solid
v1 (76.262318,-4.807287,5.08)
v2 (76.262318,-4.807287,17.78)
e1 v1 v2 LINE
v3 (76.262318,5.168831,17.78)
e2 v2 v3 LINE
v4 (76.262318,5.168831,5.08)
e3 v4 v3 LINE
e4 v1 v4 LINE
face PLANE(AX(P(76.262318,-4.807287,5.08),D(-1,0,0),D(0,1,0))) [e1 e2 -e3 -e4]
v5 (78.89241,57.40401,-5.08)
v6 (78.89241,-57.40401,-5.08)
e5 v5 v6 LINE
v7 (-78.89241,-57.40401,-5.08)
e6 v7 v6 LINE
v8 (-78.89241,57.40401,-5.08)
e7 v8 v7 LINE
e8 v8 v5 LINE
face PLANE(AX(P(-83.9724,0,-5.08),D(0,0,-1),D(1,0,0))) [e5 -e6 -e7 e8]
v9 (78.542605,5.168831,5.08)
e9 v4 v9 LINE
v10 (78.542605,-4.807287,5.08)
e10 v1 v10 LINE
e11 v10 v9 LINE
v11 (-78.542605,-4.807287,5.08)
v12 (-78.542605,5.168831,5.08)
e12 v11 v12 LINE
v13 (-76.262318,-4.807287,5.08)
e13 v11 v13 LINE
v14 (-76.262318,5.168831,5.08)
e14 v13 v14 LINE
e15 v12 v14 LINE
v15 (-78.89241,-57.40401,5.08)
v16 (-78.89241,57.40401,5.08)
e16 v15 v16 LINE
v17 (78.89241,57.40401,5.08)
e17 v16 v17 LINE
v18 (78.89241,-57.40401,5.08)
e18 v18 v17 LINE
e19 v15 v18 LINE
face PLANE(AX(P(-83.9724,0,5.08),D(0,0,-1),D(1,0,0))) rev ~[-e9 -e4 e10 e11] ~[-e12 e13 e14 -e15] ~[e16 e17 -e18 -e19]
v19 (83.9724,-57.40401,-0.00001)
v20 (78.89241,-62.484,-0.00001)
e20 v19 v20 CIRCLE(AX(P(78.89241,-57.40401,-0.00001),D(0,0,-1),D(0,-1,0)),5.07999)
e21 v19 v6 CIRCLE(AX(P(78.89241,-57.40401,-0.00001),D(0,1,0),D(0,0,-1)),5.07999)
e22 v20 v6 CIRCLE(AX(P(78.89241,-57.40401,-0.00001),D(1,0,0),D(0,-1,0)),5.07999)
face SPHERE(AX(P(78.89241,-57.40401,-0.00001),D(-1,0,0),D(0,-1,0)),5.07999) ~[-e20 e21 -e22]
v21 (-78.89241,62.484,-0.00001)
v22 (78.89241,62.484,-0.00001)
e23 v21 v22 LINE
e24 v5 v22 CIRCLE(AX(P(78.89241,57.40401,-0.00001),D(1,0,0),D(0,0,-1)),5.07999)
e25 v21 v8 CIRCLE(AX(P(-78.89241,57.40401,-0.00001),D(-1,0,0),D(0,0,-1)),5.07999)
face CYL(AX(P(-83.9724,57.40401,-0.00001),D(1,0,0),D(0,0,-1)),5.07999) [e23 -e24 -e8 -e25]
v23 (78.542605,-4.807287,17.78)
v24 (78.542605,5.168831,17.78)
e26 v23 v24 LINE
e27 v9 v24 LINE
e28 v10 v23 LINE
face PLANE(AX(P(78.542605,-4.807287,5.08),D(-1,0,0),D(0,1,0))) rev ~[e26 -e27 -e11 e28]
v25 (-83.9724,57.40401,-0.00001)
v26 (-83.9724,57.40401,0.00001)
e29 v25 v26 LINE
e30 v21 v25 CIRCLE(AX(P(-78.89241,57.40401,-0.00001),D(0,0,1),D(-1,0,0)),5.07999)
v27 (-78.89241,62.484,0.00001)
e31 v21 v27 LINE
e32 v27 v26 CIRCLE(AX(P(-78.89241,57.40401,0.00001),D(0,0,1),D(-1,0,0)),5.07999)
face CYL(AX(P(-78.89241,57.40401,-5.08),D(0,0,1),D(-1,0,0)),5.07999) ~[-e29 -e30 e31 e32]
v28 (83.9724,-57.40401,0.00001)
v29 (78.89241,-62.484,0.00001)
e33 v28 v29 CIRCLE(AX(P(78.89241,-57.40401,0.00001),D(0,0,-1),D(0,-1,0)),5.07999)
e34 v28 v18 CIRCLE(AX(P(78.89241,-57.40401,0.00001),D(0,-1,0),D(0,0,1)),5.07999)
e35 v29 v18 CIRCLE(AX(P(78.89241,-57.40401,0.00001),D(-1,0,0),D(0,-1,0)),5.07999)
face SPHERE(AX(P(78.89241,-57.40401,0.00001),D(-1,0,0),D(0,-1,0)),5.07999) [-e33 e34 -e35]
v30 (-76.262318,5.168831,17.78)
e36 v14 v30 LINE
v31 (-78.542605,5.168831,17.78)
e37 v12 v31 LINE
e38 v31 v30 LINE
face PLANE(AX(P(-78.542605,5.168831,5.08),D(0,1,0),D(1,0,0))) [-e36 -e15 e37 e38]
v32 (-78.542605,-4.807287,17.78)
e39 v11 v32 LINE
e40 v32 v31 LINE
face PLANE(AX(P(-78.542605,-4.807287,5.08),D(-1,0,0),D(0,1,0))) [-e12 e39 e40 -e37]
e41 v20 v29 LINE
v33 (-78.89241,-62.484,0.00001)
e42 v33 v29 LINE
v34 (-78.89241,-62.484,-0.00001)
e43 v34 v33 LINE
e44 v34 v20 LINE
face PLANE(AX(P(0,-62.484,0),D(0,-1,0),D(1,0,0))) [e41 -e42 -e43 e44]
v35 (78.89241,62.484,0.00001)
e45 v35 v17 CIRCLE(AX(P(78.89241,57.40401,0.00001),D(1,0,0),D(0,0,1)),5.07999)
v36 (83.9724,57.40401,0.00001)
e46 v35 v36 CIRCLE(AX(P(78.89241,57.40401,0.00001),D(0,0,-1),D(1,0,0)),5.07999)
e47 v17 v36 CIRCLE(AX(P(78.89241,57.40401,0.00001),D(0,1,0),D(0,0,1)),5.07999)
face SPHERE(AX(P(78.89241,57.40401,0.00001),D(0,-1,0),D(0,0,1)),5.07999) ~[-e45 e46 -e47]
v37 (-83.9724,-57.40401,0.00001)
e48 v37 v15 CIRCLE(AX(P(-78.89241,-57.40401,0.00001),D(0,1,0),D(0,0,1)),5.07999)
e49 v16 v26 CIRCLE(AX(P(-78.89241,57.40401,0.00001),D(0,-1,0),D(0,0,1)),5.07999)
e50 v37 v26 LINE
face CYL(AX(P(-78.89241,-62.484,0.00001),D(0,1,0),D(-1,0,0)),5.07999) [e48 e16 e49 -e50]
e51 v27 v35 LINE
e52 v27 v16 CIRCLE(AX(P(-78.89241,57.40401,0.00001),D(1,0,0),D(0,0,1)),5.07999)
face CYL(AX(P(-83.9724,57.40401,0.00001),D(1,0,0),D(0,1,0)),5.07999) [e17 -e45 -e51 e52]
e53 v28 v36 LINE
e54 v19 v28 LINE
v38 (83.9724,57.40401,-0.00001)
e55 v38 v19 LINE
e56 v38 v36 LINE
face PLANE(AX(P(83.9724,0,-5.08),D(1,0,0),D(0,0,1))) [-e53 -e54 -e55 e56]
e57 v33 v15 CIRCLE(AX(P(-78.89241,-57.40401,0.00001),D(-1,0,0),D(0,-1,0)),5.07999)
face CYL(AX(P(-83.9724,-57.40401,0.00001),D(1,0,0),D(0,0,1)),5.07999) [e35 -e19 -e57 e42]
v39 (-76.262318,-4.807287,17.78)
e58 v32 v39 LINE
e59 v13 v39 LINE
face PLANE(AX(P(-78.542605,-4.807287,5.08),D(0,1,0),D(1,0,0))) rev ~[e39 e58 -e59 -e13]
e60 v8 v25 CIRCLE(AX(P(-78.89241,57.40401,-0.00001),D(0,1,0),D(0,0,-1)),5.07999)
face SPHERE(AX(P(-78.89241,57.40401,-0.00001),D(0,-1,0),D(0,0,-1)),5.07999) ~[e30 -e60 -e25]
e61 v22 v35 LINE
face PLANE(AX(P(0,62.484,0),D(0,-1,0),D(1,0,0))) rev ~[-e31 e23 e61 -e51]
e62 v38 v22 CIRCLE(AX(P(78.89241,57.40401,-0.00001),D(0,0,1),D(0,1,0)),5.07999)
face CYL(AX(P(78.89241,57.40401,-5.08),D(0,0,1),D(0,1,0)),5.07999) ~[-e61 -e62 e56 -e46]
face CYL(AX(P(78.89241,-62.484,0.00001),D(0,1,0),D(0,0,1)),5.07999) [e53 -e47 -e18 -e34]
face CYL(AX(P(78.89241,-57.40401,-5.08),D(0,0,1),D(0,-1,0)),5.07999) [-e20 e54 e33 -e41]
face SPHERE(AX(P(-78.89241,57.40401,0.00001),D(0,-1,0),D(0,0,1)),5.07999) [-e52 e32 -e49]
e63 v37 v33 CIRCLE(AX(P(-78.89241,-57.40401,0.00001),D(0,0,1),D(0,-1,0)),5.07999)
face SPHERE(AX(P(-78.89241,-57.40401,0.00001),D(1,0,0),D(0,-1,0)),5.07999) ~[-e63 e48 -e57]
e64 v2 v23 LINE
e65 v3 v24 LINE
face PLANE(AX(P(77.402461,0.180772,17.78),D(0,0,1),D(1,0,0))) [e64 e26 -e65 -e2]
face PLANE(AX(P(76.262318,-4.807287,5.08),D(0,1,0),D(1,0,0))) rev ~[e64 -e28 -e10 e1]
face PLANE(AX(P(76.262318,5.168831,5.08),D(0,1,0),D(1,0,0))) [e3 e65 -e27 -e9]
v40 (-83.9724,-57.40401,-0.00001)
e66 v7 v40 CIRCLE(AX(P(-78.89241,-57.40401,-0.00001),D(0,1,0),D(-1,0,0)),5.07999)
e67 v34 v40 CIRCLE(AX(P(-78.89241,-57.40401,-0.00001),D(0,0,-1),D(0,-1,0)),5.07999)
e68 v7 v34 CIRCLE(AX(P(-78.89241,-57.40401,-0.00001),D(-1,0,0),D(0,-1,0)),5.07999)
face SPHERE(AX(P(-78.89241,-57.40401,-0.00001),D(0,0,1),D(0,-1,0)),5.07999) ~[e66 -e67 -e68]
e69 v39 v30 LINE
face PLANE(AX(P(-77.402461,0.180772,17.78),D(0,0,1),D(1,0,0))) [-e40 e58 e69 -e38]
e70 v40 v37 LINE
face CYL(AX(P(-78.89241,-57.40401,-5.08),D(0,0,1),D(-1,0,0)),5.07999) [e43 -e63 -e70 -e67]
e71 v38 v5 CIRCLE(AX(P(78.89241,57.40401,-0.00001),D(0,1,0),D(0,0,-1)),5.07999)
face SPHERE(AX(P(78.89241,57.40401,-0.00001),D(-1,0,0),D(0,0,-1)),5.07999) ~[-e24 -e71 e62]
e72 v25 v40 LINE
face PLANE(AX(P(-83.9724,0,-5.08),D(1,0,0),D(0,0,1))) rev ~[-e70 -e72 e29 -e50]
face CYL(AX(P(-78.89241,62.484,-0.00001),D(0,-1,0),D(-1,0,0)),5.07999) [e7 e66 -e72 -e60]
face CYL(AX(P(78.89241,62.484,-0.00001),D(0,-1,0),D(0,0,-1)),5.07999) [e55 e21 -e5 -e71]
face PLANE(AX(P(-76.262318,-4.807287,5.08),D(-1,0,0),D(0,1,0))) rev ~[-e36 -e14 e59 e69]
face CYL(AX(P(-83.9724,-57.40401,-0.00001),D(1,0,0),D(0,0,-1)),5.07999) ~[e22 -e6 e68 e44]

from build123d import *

# Parameters (mm, degrees)
F0_W     = 167.9448
F0_H     = 10.16
F1_DEPTH = 62.484
F2_W     = 2.2802874446
F2_H     = 9.9761183374
F3_DEPTH = 12.7
F4_R     = 5.07999


# Not quite as in the source:
# - a fillet or chamfer is up to 0.001 mm smaller than in the source, because OpenCascade refuses the exact size


with BuildPart() as f1:
    # F0 (on Front) → F1 (new body, symmetric)
    with BuildSketch(Plane.XZ):
        Rectangle(F0_W, F0_H)
    extrude(amount=F1_DEPTH, both=True)

    # F2 (on face) → F3 (join)
    with BuildSketch(Plane.XY.offset(5.08)):
        with Locations((-77.4024613202, 0.1807718072)):
            Rectangle(F2_W, F2_H)
        with Locations((77.4024613202, 0.1807718072)):
            Rectangle(F2_W, F2_H)
    extrude(amount=F3_DEPTH)

    # F4 (radius 5.08 in the source; OpenCascade refuses exactly that, so slightly less here)
    f4_edges = [f1.edges().sort_by_distance(p)[0] for p in [
        (0, -62.484, 5.08),
        (-83.9724, -62.484, 0),
        (0, -62.484, -5.08),
        (83.9724, -62.484, 0),
        (83.9724, 0, 5.08),
        (-83.9724, 0, 5.08),
        (0, 62.484, 5.08),
        (-83.9724, 0, -5.08),
        (0, 62.484, -5.08),
        (83.9724, 0, -5.08),
        (83.9724, 62.484, 0),
        (-83.9724, 62.484, 0),
    ]]
    fillet(f4_edges, radius=F4_R)


solid = f1.part
